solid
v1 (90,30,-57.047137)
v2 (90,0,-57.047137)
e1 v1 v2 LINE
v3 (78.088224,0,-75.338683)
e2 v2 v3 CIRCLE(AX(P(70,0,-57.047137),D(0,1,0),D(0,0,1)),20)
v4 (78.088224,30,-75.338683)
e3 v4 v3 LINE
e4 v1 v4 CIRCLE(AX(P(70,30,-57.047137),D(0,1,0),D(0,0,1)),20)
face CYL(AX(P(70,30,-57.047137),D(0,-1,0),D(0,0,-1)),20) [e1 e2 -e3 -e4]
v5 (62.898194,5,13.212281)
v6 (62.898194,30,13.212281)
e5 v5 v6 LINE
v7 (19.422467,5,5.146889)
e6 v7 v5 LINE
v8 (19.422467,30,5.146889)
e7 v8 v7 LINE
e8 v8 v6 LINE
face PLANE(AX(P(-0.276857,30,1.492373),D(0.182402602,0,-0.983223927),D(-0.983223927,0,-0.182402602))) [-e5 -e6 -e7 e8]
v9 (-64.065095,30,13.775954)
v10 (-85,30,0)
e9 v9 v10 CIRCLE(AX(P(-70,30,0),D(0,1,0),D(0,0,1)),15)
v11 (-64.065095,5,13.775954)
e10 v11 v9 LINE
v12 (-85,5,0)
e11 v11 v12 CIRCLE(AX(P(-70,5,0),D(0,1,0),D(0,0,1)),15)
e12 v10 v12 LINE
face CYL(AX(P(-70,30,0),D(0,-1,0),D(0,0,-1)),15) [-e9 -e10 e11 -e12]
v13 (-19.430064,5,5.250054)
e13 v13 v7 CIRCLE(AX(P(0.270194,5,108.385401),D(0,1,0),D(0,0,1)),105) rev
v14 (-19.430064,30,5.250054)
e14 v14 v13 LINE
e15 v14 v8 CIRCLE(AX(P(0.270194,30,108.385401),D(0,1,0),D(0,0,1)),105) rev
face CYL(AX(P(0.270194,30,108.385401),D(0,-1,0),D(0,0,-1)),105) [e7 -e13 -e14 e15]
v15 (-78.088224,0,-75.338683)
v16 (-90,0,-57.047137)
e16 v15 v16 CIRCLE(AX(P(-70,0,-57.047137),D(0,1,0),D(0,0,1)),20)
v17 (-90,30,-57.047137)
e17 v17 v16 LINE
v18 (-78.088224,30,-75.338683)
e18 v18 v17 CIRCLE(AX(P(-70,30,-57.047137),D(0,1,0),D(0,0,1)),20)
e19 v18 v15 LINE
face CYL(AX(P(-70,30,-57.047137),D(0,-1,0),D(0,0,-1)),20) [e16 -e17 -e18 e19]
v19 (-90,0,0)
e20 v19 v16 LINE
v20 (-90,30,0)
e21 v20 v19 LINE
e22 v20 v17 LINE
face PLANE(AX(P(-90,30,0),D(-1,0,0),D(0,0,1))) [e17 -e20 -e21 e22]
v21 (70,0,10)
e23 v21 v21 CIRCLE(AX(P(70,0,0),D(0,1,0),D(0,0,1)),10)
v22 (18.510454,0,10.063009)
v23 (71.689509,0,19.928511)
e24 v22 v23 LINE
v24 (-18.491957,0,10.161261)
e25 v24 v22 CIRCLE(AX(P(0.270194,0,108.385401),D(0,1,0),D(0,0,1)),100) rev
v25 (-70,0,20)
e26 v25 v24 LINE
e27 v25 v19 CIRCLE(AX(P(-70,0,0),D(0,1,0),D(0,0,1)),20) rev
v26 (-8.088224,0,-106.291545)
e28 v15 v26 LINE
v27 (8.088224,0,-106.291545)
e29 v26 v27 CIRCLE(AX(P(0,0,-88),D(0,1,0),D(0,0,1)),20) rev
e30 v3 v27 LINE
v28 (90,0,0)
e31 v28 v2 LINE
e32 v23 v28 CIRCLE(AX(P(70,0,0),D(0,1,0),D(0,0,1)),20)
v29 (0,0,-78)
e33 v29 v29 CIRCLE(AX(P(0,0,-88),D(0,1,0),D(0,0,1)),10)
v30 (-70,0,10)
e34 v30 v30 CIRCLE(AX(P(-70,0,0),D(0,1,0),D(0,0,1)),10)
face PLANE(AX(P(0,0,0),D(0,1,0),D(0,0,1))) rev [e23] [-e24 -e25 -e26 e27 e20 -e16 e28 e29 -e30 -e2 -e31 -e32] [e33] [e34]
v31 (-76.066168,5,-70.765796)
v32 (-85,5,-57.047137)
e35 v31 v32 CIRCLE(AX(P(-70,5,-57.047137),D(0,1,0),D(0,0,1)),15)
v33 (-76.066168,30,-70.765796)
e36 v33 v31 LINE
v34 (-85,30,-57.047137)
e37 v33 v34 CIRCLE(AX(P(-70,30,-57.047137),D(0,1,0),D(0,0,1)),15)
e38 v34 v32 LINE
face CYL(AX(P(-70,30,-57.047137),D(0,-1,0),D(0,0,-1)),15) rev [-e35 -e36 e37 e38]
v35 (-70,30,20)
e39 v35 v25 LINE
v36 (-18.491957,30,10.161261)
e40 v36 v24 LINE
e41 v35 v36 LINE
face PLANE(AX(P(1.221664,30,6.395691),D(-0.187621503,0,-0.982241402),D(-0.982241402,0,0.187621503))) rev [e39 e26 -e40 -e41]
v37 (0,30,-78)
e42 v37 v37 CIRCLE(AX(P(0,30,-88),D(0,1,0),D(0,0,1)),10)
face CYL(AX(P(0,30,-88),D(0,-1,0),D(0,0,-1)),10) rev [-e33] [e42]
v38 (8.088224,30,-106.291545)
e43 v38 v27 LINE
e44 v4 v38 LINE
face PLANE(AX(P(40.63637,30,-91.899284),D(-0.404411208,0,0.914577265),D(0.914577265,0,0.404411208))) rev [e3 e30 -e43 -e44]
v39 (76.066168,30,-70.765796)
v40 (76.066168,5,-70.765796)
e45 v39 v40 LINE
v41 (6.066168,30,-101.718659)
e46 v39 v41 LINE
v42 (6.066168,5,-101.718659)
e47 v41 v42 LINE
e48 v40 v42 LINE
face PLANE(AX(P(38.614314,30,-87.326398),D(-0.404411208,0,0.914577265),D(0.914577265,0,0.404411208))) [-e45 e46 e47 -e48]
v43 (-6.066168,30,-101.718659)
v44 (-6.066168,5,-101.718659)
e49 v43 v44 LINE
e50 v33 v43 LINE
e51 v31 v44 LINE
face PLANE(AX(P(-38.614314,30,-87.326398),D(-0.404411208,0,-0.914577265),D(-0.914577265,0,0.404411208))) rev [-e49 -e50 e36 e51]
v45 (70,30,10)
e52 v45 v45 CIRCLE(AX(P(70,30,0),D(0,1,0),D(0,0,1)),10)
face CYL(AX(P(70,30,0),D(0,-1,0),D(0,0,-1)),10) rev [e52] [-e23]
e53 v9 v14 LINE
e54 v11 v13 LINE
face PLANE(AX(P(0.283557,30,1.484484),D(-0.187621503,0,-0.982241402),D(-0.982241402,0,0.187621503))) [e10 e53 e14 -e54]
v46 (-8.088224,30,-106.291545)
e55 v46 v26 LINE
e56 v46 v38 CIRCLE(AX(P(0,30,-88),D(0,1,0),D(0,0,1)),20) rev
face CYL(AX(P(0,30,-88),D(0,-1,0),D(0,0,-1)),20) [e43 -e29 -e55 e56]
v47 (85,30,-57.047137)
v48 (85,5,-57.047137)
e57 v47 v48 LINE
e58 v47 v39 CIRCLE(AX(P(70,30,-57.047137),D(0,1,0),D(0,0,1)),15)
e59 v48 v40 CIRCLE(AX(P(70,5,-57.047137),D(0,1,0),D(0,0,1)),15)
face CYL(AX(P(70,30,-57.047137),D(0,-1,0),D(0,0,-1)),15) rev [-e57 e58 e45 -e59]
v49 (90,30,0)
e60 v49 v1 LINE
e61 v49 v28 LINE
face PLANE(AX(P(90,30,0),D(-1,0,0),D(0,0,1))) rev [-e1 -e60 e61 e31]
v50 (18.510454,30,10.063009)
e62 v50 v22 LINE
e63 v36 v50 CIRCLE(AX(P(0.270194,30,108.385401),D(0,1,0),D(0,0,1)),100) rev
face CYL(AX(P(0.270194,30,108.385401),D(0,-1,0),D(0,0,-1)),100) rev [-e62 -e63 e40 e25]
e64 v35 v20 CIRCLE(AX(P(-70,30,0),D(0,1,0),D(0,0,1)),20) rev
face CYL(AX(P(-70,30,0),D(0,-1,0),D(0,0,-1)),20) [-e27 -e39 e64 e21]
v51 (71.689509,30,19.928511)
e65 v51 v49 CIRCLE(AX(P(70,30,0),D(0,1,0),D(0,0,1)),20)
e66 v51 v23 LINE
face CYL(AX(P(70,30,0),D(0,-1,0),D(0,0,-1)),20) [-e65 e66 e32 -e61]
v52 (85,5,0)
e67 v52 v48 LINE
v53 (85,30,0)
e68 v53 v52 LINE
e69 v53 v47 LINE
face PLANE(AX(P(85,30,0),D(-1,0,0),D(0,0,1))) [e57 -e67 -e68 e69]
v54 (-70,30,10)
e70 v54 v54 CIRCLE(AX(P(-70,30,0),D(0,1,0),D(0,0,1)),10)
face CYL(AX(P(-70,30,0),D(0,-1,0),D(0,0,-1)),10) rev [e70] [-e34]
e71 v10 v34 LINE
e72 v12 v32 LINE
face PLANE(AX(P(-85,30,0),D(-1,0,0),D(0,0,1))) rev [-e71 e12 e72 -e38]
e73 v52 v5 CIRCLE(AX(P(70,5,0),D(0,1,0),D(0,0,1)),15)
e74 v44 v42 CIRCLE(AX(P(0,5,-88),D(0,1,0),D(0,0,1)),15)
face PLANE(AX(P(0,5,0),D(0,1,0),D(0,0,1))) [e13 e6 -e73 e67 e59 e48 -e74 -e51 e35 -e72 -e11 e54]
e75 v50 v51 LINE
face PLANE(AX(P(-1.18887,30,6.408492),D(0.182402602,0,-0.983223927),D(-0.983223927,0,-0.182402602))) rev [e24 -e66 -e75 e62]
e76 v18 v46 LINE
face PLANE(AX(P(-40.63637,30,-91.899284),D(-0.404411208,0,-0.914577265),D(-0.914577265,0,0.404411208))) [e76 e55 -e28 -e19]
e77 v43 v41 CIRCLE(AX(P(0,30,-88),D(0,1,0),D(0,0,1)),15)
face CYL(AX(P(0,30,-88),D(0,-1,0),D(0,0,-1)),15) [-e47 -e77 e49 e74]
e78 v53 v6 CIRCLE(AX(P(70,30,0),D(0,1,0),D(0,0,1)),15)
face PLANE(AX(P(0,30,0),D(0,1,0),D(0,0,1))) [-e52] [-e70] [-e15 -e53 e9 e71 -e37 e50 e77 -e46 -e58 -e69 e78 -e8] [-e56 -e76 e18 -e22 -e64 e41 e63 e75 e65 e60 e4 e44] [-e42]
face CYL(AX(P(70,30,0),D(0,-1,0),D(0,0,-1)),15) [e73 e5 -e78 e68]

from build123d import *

# Parameters (mm, degrees)
SKETCH1_R           = 10
BOSS_EXTRUDE1_DEPTH = 30
SHELL3_START        = 5
SHELL3_DEPTH        = 25


# Read off the part's stored shape, not the designer's step: Shell3
with BuildPart() as part:
    # Sketch1 → Boss-Extrude1 (new body)
    with BuildSketch(Plane(origin=(0, 0, 0), x_dir=(1, 0, 0), z_dir=(0, 1, 0))):
        with BuildLine():
            Line((90, 0), (90, 57.047137228))
            ThreePointArc((90, 57.047137228), (86.75954181, 67.961245451), (78.088224169, 75.338682537))
            Line((78.088224169, 75.338682537), (8.088224169, 106.291545309))
            ThreePointArc((8.088224169, 106.291545309), (0, 108), (-8.088224169, 106.291545309))
            Line((-8.088224169, 106.291545309), (-78.088224169, 75.338682537))
            ThreePointArc((-78.088224169, 75.338682537), (-86.75954181, 67.961245451), (-90, 57.047137228))
            Line((-90, 57.047137228), (-90, 0))
            ThreePointArc((-90, 0), (-84.142135624, -14.142135624), (-70, -20))
            Line((-70, -20), (-18.49195659, -10.161261295))
            ThreePointArc((-18.49195659, -10.161261295), (0.004664589, -8.385754022), (18.510453887, -10.063008789))
            Line((18.510453887, -10.063008789), (71.68950902, -19.928511216))
            ThreePointArc((71.68950902, -19.928511216), (84.727358561, -13.531626281), (90, 0))
        make_face()
        with Locations(Location((-70, 0, 0), (0, 0, 270))):
            Circle(SKETCH1_R, mode=Mode.SUBTRACT)
        with Locations(Location((70, 0, 0), (0, 0, 270))):
            Circle(SKETCH1_R, mode=Mode.SUBTRACT)
        with Locations(Location((0, 88, 0), (0, 0, 270))):
            Circle(SKETCH1_R, mode=Mode.SUBTRACT)
    extrude(amount=BOSS_EXTRUDE1_DEPTH)

    # Shell3 outline → Shell3 (cut)
    with BuildSketch(Plane(origin=(0, 0, 0), x_dir=(1, 0, 0), z_dir=(0, 1, 0)).offset(SHELL3_START)):
        with BuildLine():
            Line((-85, 57.047137228), (-85, 0))
            ThreePointArc((-85, 0), (-61.754503332, 12.530434338), (-64.065095374, -13.775953944))
            Line((-64.065095374, -13.775953944), (-19.430064103, -5.250054285))
            ThreePointArc((-19.430064103, -5.250054285), (-0.008611865, -3.385771649), (19.422466898, -5.146889154))
            Line((19.422466898, -5.146889154), (62.898194489, -13.212280594))
            ThreePointArc((62.898194489, -13.212280594), (62.303477495, 12.874919081), (85, 0))
            Line((85, 0), (85, 57.047137228))
            ThreePointArc((85, 57.047137228), (82.569656358, 65.232718395), (76.066168127, 70.765796209))
            Line((76.066168127, 70.765796209), (6.066168127, 101.718658982))
            ThreePointArc((6.066168127, 101.718658982), (0, 73), (-6.066168127, 101.718658982))
            Line((-6.066168127, 101.718658982), (-76.066168127, 70.765796209))
            ThreePointArc((-76.066168127, 70.765796209), (-82.569656358, 65.232718395), (-85, 57.047137228))
        make_face()
    extrude(amount=SHELL3_DEPTH, mode=Mode.SUBTRACT)


solid = part.part
